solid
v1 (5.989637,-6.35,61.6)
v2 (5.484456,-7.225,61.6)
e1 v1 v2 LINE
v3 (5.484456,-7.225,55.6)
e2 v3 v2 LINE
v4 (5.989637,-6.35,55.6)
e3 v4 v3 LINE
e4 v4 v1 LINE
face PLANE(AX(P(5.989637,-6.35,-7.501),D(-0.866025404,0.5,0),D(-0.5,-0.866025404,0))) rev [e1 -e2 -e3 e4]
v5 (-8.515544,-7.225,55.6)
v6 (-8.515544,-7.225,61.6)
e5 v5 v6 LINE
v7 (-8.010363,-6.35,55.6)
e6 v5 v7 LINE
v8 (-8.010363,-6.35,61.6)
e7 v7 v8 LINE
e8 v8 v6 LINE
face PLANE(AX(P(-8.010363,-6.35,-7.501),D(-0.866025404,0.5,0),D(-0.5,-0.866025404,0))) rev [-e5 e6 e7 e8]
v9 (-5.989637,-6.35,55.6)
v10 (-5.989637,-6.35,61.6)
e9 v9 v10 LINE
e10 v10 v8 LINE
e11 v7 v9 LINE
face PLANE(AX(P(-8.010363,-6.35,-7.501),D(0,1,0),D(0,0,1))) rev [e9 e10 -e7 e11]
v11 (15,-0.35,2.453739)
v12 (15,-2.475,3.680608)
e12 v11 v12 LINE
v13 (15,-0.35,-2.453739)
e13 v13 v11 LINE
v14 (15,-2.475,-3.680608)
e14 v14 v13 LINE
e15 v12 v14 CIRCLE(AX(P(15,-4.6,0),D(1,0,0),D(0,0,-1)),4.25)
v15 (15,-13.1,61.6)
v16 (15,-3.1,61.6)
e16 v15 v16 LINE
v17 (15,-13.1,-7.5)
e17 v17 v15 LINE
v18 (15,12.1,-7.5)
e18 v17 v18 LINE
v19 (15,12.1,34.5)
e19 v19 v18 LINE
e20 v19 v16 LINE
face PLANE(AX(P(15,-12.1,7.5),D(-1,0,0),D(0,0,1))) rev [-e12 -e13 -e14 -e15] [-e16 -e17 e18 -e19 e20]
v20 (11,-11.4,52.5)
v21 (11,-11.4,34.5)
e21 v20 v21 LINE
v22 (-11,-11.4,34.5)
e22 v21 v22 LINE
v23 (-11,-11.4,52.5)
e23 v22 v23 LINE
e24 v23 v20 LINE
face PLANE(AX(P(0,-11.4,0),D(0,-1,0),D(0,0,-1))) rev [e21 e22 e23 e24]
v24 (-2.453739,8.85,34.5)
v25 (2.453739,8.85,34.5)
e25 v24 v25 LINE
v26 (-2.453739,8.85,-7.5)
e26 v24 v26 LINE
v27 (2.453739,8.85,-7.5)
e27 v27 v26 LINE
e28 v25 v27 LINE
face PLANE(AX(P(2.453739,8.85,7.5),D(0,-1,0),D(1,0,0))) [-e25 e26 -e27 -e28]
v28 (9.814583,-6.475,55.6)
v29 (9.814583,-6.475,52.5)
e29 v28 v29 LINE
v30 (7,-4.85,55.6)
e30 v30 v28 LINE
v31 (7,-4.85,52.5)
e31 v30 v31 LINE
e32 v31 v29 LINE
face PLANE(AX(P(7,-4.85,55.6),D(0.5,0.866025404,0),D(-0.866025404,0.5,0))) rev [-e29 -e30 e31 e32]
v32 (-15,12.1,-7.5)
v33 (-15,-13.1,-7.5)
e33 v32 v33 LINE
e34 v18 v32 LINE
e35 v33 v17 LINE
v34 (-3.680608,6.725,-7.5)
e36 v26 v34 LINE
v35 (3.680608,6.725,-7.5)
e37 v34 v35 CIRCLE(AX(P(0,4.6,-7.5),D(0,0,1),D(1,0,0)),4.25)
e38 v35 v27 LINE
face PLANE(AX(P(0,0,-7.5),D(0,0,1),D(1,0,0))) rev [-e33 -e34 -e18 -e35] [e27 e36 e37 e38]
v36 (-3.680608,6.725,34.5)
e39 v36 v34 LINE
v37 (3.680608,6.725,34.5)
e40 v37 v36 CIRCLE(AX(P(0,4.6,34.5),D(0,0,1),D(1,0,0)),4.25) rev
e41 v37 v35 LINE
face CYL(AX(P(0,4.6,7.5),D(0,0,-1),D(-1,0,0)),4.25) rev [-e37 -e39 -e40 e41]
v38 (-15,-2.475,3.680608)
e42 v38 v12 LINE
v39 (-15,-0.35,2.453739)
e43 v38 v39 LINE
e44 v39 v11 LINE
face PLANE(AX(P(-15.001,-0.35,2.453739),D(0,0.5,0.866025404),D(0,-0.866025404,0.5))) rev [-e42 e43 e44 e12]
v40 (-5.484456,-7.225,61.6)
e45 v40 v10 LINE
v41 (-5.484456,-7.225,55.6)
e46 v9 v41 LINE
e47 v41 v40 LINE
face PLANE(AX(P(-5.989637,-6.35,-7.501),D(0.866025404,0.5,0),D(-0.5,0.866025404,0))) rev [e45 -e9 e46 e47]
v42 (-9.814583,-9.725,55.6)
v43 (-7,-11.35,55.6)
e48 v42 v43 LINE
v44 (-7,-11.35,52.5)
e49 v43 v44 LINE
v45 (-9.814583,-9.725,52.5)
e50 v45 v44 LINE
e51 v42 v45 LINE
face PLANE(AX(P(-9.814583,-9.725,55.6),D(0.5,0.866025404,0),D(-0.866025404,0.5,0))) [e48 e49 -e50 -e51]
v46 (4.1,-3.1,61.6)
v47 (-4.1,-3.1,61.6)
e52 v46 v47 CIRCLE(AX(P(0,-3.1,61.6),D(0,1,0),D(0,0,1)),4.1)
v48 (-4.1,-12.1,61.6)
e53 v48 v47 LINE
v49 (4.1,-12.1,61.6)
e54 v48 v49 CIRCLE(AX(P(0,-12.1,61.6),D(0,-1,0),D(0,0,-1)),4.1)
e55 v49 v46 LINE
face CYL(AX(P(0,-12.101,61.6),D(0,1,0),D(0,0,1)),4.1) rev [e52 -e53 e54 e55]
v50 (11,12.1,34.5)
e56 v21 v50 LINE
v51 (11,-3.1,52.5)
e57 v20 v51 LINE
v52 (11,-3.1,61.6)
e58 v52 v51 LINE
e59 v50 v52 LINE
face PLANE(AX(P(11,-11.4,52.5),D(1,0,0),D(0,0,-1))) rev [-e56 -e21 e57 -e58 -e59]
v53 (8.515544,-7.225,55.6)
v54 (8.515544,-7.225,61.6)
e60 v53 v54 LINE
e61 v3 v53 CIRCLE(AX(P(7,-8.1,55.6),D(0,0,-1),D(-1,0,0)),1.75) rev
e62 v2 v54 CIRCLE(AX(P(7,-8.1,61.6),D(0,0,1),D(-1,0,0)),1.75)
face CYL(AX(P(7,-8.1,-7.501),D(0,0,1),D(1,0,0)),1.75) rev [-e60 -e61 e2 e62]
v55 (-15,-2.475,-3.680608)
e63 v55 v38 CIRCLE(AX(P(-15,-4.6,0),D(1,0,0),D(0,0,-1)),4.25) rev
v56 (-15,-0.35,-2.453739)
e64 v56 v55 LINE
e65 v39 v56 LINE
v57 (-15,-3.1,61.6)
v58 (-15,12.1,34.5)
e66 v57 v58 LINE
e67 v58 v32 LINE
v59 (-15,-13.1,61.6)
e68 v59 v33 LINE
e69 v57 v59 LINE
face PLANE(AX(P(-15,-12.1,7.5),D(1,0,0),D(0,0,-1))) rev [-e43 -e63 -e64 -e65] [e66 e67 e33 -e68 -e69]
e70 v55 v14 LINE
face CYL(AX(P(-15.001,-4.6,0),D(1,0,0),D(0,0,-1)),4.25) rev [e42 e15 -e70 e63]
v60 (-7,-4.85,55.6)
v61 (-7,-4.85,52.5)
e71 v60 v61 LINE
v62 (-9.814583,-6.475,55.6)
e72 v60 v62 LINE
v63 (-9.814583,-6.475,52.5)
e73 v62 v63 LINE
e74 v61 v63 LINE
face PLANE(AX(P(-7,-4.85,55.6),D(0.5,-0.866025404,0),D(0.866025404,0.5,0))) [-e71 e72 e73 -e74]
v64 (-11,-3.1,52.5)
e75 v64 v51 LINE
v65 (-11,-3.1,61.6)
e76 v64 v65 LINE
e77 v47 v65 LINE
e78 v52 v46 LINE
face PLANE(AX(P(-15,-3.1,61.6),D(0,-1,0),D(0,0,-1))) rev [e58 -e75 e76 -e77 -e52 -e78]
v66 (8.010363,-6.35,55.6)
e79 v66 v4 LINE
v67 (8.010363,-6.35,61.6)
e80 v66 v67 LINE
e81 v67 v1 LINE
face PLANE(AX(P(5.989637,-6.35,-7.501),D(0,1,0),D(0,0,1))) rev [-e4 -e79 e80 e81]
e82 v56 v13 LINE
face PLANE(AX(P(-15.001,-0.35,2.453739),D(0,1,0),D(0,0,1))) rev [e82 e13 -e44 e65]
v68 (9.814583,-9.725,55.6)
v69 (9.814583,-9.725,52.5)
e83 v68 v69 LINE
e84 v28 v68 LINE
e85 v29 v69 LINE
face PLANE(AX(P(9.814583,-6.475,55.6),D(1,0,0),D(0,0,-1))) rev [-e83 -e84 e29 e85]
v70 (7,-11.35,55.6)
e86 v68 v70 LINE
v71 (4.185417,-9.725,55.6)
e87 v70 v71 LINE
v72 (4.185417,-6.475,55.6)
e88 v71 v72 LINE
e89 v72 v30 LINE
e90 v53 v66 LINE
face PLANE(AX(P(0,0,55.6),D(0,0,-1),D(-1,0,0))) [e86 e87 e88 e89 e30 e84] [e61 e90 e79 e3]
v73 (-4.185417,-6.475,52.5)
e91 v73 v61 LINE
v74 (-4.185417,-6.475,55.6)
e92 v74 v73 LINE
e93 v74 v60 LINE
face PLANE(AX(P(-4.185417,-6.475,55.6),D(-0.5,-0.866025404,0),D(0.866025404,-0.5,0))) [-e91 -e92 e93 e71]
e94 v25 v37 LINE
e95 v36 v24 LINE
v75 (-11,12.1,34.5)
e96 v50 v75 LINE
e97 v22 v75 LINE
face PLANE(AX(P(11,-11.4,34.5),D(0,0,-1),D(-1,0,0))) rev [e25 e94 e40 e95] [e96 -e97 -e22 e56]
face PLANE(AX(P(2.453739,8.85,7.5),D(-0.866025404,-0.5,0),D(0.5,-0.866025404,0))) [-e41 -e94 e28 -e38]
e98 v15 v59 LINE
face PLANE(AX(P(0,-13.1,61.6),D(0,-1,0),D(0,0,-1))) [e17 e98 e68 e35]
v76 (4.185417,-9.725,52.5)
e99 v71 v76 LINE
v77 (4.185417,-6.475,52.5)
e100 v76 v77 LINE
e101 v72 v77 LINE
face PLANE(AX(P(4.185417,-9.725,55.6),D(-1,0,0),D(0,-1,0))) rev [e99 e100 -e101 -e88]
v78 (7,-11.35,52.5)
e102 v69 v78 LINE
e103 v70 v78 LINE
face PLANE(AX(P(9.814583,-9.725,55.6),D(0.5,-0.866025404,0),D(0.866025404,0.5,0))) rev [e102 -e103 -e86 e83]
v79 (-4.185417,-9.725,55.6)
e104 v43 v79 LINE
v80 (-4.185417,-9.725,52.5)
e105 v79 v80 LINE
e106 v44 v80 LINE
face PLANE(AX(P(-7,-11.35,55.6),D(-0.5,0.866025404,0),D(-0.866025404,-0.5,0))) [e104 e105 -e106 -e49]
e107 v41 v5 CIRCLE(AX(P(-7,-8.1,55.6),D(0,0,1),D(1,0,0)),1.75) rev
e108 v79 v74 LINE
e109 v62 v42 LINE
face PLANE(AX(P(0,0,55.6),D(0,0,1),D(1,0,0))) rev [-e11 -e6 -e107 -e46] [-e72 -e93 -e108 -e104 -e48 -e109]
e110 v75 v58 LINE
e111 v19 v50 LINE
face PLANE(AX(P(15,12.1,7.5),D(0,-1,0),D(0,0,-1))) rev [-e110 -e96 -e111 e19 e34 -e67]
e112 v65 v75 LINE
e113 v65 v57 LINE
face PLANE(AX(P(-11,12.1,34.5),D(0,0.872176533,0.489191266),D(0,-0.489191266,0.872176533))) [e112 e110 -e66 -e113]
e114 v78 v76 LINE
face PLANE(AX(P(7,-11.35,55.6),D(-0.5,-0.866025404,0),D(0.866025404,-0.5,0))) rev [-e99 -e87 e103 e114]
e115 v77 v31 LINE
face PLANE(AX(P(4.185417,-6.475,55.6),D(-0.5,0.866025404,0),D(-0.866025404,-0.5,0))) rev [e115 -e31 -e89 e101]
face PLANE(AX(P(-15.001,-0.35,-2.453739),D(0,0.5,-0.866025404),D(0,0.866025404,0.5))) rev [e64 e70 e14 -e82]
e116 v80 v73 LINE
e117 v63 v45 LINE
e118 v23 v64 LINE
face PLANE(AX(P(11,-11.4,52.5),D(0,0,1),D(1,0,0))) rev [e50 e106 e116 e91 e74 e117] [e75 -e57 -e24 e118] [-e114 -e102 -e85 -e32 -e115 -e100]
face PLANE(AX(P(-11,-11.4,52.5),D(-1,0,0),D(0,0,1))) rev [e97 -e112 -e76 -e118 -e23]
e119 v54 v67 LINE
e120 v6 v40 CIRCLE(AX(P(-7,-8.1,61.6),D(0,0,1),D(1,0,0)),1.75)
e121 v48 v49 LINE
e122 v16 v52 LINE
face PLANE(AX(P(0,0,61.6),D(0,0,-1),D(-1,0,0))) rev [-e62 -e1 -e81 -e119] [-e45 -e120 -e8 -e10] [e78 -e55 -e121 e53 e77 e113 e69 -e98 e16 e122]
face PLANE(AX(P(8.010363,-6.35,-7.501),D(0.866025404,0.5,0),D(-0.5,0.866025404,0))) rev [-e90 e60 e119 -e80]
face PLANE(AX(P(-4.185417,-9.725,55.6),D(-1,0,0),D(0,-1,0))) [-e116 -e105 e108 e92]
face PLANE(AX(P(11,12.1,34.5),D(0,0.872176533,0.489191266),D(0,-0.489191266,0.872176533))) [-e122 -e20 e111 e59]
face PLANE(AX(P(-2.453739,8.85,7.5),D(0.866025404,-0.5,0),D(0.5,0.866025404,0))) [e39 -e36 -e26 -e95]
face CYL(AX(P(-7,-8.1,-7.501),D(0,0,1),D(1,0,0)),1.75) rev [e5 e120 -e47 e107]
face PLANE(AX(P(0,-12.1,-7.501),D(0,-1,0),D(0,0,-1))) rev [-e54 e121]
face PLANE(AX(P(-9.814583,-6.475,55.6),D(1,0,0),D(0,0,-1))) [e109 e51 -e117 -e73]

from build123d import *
from build123d.topology import SkipClean

# Parameters (mm, degrees)
SCHIZZO7_W                    = 30
SCHIZZO7_H                    = 24.2
ESTRUSIONE_ESTRUSIONE3_DEPTH  = 7.5
TAGLIO_ESTRUSIONE1_REACH      = 35.206
SCHIZZO12_W                   = 30
SCHIZZO12_H                   = 9
ESTRUSIONE_ESTRUSIONE5_DEPTH  = 54.1
TAGLIO_ESTRUSIONE3_REACH      = 67.197
SCHIZZO15_W                   = 22
SCHIZZO15_H                   = 18
TAGLIO_ESTRUSIONE4_DEPTH      = 8.3
TAGLIO_ESTRUSIONE5_REACH      = 73.737
TAGLIO_ESTRUSIONE6_DEPTH      = 3.1
SCHIZZO20_W                   = 30
SCHIZZO20_H                   = 15.2
ESTRUSIONE_ESTRUSIONE6_DEPTH  = 27
ESTRUSIONE_ESTRUSIONE7_DEPTH  = 4
ESTRUSIONE_ESTRUSIONE8_DEPTH  = 4
ESTRUSIONE_ESTRUSIONE9_DEPTH  = 1
ESTRUSIONE_ESTRUSIONE10_START = -13.1
ESTRUSIONE_ESTRUSIONE10_DEPTH = 1


# Read off the part's stored shape, not the designer's step: Estrusione-Estrusione10
with BuildPart() as part:
    # Schizzo7 → Estrusione-Estrusione3 (new, symmetric)
    with BuildSketch(Plane.XY):
        Rectangle(SCHIZZO7_W, SCHIZZO7_H)
        with BuildLine():
            Line((2.453738644, 8.85), (-2.453738644, 8.85))
            Line((-2.453738644, 8.85), (-3.680607966, 6.725))
            ThreePointArc((-3.680607966, 6.725), (0, 0.35), (3.680607966, 6.725))
            Line((3.680607966, 6.725), (2.453738644, 8.85))
        make_face(mode=Mode.SUBTRACT)
    extrude(amount=ESTRUSIONE_ESTRUSIONE3_DEPTH, both=True)

    # Schizzo8 → Taglio-Estrusione1 (cut, up to next)
    with BuildSketch(Plane(origin=(15, 0, 0), x_dir=(0, 0, -1), z_dir=(1, 0, 0)), mode=Mode.PRIVATE) as taglio_estrusione1_sk1:
        with BuildLine():
            Line((-2.453738644, -0.35), (2.453738644, -0.35))
            Line((2.453738644, -0.35), (3.680607966, -2.475))
            ThreePointArc((3.680607966, -2.475), (0, -8.85), (-3.680607966, -2.475))
            Line((-3.680607966, -2.475), (-2.453738644, -0.35))
        make_face()
    taglio_estrusione1_tool1 = extrude(taglio_estrusione1_sk1.sketch, amount=-TAGLIO_ESTRUSIONE1_REACH, mode=Mode.PRIVATE) & part.part
    add(taglio_estrusione1_tool1.solids().sort_by_distance((15, -4.474132, 0))[0], mode=Mode.SUBTRACT)

    # Schizzo12 → Estrusione-Estrusione5 (add)
    with BuildSketch(Plane.XY.offset(7.5)):
        with Locations((0, -7.6)):
            Rectangle(SCHIZZO12_W, SCHIZZO12_H)
    extrude(amount=ESTRUSIONE_ESTRUSIONE5_DEPTH)

    # Schizzo14 → Taglio-Estrusione3 (cut, up to next)
    with BuildSketch(Plane(origin=(0, -3.1, 0), x_dir=(1, 0, 0), z_dir=(0, 1, 0)), mode=Mode.PRIVATE) as taglio_estrusione3_sk1:
        with BuildLine():
            Line((4.1, -61.6), (-4.1, -61.6))
            ThreePointArc((-4.1, -61.6), (0, -57.5), (4.1, -61.6))
        make_face()
    taglio_estrusione3_tool1 = extrude(taglio_estrusione3_sk1.sketch, amount=-TAGLIO_ESTRUSIONE3_REACH, mode=Mode.PRIVATE) & part.part
    add(taglio_estrusione3_tool1.solids().sort_by_distance((0, -3.1, 59.859906))[0], mode=Mode.SUBTRACT)

    # Schizzo15 → Taglio-Estrusione4 (cut)
    with BuildSketch(Plane(origin=(0, -3.1, 0), x_dir=(1, 0, 0), z_dir=(0, 1, 0))):
        with Locations((0, -43.5)):
            Rectangle(SCHIZZO15_W, SCHIZZO15_H)
    extrude(amount=-TAGLIO_ESTRUSIONE4_DEPTH, mode=Mode.SUBTRACT)

    # Schizzo16 → Taglio-Estrusione5 (cut, up to next)
    with BuildSketch(Plane.XY.offset(61.6), mode=Mode.PRIVATE) as taglio_estrusione5_sk1:
        with BuildLine():
            Line((-8.010362971, -6.35), (-5.989637029, -6.35))
            Line((-5.989637029, -6.35), (-5.484455543, -7.225))
            ThreePointArc((-5.484455543, -7.225), (-7, -9.85), (-8.515544457, -7.225))
            Line((-8.515544457, -7.225), (-8.010362971, -6.35))
        make_face()
    taglio_estrusione5_tool1 = extrude(taglio_estrusione5_sk1.sketch, amount=-TAGLIO_ESTRUSIONE5_REACH, mode=Mode.PRIVATE) & part.part
    # Schizzo16 → Taglio-Estrusione5 (cut, up to next)
    with BuildSketch(Plane.XY.offset(61.6), mode=Mode.PRIVATE) as taglio_estrusione5_sk2:
        with BuildLine():
            Line((5.989637029, -6.35), (8.010362971, -6.35))
            Line((8.010362971, -6.35), (8.515544457, -7.225))
            ThreePointArc((8.515544457, -7.225), (7, -9.85), (5.484455543, -7.225))
            Line((5.484455543, -7.225), (5.989637029, -6.35))
        make_face()
    taglio_estrusione5_tool2 = extrude(taglio_estrusione5_sk2.sketch, amount=-TAGLIO_ESTRUSIONE5_REACH, mode=Mode.PRIVATE) & part.part
    add(taglio_estrusione5_tool1.solids().sort_by_distance((-7, -8.048172, 61.6))[0], mode=Mode.SUBTRACT)
    add(taglio_estrusione5_tool2.solids().sort_by_distance((7, -8.048172, 61.6))[0], mode=Mode.SUBTRACT)

    # Schizzo17 → Taglio-Estrusione6 (cut)
    with BuildSketch(Plane(origin=(0, 0, 52.5), x_dir=(-1, 0, 0), z_dir=(0, 0, -1))):
        Polygon((-7, -11.35), (-4.185417438, -9.725), (-4.185417438, -6.475), (-7, -4.85), (-9.814582562, -6.475), (-9.814582562, -9.725), align=None)
        Polygon((9.814582562, -9.725), (7, -11.35), (4.185417438, -9.725), (4.185417438, -6.475), (7, -4.85), (9.814582562, -6.475), align=None)
    extrude(amount=-TAGLIO_ESTRUSIONE6_DEPTH, mode=Mode.SUBTRACT)

    # Schizzo20 → Estrusione-Estrusione6 (add)
    with SkipClean():  # the faces are left unmerged after this step: merging them gives an invalid solid
        with BuildSketch(Plane.XY.offset(7.5)):
            with Locations((0, 4.5)):
                Rectangle(SCHIZZO20_W, SCHIZZO20_H)
            with BuildLine():
                Line((-2.453738644, 8.85), (2.453738644, 8.85))
                Line((2.453738644, 8.85), (3.680607966, 6.725))
                ThreePointArc((3.680607966, 6.725), (0, 0.35), (-3.680607966, 6.725))
                Line((-3.680607966, 6.725), (-2.453738644, 8.85))
            make_face(mode=Mode.SUBTRACT)
        extrude(amount=ESTRUSIONE_ESTRUSIONE6_DEPTH)

    # Schizzo21 → Estrusione-Estrusione7 (add)
    with SkipClean():  # the faces are left unmerged after this step: merging them gives an invalid solid
        with BuildSketch(Plane.ZY.offset(15)):
            Polygon((34.5, 12.1), (61.6, -3.1), (34.5, -3.1), align=None)
        extrude(amount=-ESTRUSIONE_ESTRUSIONE7_DEPTH)

    # Schizzo22 → Estrusione-Estrusione8 (add)
    with SkipClean():  # the faces are left unmerged after this step: merging them gives an invalid solid
        with BuildSketch(Plane(origin=(15, 0, 0), x_dir=(0, 0, -1), z_dir=(1, 0, 0))):
            Polygon((-34.5, 12.1), (-61.6, -3.1), (-34.5, -3.1), align=None)
        extrude(amount=-ESTRUSIONE_ESTRUSIONE8_DEPTH)

    # Schizzo24 → Estrusione-Estrusione9 (add)
    with SkipClean():  # the faces are left unmerged after this step: merging them gives an invalid solid
        with BuildSketch(Plane.XZ.offset(12.1)):
            with BuildLine():
                Line((15, 61.6), (4.1, 61.6))
                ThreePointArc((4.1, 61.6), (0, 57.5), (-4.1, 61.6))
                Line((-4.1, 61.6), (-15, 61.6))
                Line((-15, 61.6), (-15, -7.5))
                Line((-15, -7.5), (15, -7.5))
                Line((15, -7.5), (15, 61.6))
            make_face()
        extrude(amount=ESTRUSIONE_ESTRUSIONE9_DEPTH)

    # Estrusione-Estrusione10 outline → Estrusione-Estrusione10 (add)
    with SkipClean():  # the faces are left unmerged after this step: merging them gives an invalid solid
        with BuildSketch(Plane(origin=(0, 0, 0), x_dir=(1, 0, 0), z_dir=(0, 1, 0)).offset(ESTRUSIONE_ESTRUSIONE10_START)):
            with BuildLine():
                Line((-4.1, -61.6), (4.1, -61.6))
                ThreePointArc((4.1, -61.6), (0, -57.5), (-4.1, -61.6))
            make_face()
        extrude(amount=ESTRUSIONE_ESTRUSIONE10_DEPTH)


solid = part.part
